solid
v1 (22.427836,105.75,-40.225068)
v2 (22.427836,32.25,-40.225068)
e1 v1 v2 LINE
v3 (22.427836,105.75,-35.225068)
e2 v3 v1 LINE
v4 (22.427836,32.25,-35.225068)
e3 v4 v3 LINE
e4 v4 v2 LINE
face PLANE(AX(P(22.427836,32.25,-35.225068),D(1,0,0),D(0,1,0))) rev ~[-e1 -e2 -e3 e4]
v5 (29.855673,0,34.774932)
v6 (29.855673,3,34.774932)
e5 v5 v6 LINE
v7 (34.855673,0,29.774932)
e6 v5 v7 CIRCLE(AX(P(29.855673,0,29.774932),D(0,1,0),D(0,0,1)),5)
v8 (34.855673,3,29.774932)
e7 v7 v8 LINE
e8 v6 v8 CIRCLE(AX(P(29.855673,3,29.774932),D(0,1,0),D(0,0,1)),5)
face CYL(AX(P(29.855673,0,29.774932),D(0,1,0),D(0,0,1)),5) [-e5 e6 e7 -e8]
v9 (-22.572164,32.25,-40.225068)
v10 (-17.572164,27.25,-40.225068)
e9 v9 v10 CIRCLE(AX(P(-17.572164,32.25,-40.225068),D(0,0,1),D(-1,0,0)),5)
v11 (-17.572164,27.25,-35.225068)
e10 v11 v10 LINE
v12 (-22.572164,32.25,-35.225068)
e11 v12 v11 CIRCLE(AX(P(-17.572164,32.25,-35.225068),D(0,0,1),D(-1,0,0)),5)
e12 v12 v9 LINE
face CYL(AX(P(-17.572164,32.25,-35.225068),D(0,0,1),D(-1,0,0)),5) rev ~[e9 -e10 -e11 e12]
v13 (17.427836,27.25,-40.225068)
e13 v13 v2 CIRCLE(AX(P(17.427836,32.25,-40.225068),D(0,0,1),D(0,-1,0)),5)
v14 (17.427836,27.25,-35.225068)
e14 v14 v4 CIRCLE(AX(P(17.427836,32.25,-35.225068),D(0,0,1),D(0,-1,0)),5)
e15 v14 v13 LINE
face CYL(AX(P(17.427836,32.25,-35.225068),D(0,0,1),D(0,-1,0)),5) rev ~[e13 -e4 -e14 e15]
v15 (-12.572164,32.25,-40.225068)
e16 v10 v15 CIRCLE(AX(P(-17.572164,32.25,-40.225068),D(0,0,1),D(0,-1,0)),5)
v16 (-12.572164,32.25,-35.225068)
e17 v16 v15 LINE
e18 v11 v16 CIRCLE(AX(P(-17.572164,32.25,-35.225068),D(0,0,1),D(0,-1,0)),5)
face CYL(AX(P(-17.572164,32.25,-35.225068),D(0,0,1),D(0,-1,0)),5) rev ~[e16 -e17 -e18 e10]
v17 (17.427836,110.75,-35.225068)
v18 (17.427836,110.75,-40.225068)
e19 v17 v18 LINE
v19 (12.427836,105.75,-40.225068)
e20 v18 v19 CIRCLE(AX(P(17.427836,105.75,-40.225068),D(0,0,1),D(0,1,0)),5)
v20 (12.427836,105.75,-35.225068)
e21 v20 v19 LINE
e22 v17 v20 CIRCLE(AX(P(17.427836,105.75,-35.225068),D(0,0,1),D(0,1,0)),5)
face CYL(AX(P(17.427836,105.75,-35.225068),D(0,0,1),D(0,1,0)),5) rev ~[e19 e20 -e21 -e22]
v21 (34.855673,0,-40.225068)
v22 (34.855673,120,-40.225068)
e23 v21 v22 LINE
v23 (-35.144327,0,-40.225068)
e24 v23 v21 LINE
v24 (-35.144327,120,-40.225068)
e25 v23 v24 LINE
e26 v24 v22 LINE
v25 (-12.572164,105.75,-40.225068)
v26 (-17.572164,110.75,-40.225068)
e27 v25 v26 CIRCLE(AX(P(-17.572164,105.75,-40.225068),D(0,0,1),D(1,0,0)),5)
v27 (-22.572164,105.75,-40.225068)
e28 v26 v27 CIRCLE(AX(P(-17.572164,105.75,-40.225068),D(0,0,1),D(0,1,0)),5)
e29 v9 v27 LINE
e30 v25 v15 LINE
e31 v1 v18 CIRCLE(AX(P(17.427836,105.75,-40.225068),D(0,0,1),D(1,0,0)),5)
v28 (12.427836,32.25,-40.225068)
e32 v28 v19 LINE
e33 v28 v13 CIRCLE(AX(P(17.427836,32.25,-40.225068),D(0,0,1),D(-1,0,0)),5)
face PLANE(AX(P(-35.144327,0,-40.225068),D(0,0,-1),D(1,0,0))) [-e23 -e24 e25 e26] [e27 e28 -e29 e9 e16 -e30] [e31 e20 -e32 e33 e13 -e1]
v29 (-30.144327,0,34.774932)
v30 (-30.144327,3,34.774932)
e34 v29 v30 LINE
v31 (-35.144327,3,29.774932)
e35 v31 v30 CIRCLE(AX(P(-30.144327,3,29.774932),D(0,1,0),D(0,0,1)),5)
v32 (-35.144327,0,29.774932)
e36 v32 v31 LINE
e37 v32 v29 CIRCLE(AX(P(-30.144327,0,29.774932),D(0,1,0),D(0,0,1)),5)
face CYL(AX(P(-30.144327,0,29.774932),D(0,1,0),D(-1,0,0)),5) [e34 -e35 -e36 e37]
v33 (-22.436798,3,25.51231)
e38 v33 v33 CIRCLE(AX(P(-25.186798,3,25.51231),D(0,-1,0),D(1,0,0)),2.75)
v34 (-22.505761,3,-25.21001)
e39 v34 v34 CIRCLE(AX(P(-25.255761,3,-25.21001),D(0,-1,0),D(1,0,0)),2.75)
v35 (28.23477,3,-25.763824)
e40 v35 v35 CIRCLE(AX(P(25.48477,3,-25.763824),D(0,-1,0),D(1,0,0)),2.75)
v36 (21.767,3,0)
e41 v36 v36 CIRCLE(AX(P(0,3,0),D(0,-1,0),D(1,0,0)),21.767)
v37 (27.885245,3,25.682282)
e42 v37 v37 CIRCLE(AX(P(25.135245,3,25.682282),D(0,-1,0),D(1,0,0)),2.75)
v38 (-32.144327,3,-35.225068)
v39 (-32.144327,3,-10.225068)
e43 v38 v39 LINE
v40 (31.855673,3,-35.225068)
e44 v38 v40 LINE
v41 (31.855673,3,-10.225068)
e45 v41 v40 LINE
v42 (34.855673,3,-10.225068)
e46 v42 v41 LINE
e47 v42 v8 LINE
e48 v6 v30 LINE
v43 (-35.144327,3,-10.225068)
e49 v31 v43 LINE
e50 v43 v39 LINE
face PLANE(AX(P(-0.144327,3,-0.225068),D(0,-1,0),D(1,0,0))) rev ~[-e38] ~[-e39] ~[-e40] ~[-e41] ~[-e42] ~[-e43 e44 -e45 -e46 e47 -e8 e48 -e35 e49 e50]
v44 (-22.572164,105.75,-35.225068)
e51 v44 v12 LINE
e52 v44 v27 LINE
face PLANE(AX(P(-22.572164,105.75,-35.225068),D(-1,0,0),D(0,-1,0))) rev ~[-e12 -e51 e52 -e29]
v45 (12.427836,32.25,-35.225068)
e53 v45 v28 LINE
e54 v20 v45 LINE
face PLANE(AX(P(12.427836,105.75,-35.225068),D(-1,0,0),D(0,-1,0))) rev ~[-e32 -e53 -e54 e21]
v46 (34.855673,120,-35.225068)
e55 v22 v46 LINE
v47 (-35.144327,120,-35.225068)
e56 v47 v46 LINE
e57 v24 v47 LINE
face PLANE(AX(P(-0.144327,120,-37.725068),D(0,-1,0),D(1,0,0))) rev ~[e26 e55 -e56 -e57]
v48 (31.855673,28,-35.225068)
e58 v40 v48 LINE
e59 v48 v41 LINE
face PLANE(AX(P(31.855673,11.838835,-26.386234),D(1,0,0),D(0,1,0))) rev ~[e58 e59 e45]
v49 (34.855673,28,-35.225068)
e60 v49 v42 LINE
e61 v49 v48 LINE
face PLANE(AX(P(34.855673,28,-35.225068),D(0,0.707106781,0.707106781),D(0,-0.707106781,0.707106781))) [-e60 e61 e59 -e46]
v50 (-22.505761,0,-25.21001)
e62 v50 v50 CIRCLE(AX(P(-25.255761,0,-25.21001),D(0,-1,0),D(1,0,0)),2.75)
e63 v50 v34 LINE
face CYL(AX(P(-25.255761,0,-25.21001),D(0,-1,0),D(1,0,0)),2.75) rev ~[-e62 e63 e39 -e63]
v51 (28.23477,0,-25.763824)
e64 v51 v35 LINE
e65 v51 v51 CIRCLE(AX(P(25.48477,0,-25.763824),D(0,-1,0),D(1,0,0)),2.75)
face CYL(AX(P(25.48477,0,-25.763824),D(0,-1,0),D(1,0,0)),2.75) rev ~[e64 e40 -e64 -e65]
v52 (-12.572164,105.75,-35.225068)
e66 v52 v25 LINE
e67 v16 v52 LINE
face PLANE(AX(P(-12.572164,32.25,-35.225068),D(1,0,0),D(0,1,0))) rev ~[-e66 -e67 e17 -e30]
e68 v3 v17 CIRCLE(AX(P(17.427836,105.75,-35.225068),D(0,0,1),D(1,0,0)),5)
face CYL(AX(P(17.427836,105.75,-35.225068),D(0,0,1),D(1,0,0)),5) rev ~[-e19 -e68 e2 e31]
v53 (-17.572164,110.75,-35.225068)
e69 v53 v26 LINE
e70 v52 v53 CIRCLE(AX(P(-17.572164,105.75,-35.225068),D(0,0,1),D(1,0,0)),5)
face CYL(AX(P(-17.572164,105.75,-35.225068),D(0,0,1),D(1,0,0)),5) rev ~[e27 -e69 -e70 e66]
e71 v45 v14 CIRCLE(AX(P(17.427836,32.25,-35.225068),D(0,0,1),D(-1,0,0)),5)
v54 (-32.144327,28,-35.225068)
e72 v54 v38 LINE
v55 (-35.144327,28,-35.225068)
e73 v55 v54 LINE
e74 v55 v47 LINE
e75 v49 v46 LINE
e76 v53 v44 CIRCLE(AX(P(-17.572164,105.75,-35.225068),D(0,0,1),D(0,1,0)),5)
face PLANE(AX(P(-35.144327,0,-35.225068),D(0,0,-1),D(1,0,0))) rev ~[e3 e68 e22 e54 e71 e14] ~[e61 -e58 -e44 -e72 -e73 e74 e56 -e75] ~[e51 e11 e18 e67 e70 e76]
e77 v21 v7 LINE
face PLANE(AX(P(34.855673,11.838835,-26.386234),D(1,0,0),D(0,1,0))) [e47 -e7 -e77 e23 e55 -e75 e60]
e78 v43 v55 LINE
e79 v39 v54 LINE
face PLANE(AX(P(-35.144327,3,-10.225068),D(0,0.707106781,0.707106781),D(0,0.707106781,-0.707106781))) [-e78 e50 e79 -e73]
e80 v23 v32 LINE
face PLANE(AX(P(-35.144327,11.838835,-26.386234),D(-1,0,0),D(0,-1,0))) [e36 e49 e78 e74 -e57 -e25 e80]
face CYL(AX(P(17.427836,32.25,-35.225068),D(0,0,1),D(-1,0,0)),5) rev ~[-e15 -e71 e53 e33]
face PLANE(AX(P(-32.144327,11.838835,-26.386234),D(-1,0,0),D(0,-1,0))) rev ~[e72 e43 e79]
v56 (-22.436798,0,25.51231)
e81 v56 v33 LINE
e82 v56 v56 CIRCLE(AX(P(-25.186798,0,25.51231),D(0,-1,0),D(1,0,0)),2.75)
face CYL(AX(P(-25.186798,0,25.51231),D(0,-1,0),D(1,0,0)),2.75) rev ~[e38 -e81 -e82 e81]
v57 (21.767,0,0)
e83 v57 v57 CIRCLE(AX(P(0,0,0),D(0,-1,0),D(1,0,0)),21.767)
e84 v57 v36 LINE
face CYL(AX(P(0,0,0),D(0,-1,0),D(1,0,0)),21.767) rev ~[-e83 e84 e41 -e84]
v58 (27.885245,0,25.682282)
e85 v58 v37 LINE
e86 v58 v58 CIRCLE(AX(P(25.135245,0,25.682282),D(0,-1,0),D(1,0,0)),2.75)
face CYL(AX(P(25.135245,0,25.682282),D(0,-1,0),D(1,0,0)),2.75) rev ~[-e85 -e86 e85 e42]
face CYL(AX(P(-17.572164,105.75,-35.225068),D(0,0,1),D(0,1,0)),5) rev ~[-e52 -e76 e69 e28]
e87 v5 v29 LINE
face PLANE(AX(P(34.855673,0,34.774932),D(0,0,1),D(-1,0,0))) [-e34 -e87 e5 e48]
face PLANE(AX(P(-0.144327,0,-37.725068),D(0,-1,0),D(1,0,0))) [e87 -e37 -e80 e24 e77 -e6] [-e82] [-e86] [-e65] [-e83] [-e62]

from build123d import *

# Parameters (mm, degrees)
F0_R      = 2.75
F1_DEPTH  = 3
F2_R      = 21.767
F3_DEPTH  = 25
F0_W      = 70
F0_H      = 5
F4_DEPTH  = 120
F6_DEPTH  = 25
F7_R      = 5
F9_DEPTH  = 3
F11_DEPTH = 3


# Not quite as in the source:
# - a feature names something its author has since deleted; it is built from what else it names


with BuildPart() as f1:
    # F0 (on Front) → F1 (new body)
    with BuildSketch(Plane.XZ):
        Polygon((-35.1443272789, 34.7749316851), (-35.1443272789, -30.2250683149), (-35.1443272789, -35.2250683149), (34.8556727211, -35.2250683149), (34.8556727211, 34.7749316851), align=None)
        Polygon((29.8556727211, -20.9088045945), (29.8556727211, -30.2250683149), (21.0454399179, -30.2250683149), (-20.0690244843, -30.2250683149), (-30.1443272789, -30.2250683149), (-30.1443272789, -20.0232621124), (-30.1443272789, 20.9646839807), (-30.1443272789, 29.7749316851), (-20.9545706917, 29.7749316851), (20.6652218889, 29.7749316851), (29.8556727211, 29.7749316851), (29.8556727211, 20.9646914313), align=None, mode=Mode.SUBTRACT)
        Polygon((-20.0690244843, -30.2250683149), (21.0454399179, -30.2250683149), (21.0454399179, -23.8184407195), (23.5755527805, -20.9088045945), (29.8556727211, -20.9088045945), (29.8556727211, 20.9646914313), (22.6900065731, 20.9646914313), (20.6652218889, 22.609265537), (20.6652218889, 29.7749316851), (-20.9545706917, 29.7749316851), (-20.9545706917, 23.6213151524), (-23.6111795117, 20.9646839807), (-30.1443272789, 20.9646839807), (-30.1443272789, -20.0232621124), (-22.8521441628, -20.0232621124), (-20.0690244843, -22.5533824255), align=None)
        Polygon((-30.1443272789, 29.7749316851), (-30.1443272789, 20.9646839807), (-23.6111795117, 20.9646839807), (-20.9545706917, 23.6213151524), (-20.9545706917, 29.7749316851), align=None)
        with Locations((-25.186798494, 25.5123097608)):
            Circle(F0_R, mode=Mode.SUBTRACT)
        Polygon((22.6900065731, 20.9646914313), (29.8556727211, 20.9646914313), (29.8556727211, 29.7749316851), (20.6652218889, 29.7749316851), (20.6652218889, 22.609265537), align=None)
        with Locations((25.1352448512, 25.6822819479)):
            Circle(F0_R, mode=Mode.SUBTRACT)
        Polygon((-30.1443272789, -30.2250683149), (-20.0690244843, -30.2250683149), (-20.0690244843, -22.5533824255), (-22.8521441628, -20.0232621124), (-30.1443272789, -20.0232621124), align=None)
        with Locations((-25.255761068, -25.2100098719)):
            Circle(F0_R, mode=Mode.SUBTRACT)
        Polygon((21.0454399179, -30.2250683149), (29.8556727211, -30.2250683149), (29.8556727211, -20.9088045945), (23.5755527805, -20.9088045945), (21.0454399179, -23.8184407195), align=None)
        with Locations((25.4847700376, -25.7638242348)):
            Circle(F0_R, mode=Mode.SUBTRACT)
    extrude(amount=-F1_DEPTH)

    # F2 (on face) → F3 (cut)
    with BuildSketch(Plane.XZ):
        Circle(F2_R)
    extrude(amount=-F3_DEPTH, mode=Mode.SUBTRACT)

    # F0 (on Front) → F4 (join)
    with BuildSketch(Plane.XZ):
        with Locations((-0.1443272789, -37.7250683149)):
            Rectangle(F0_W, F0_H)
    extrude(amount=-F4_DEPTH)

    # F5 (on face) → F6 (cut)
    with BuildSketch(Plane.XY.offset(-35.2250683149)):
        with BuildLine():
            Line((-17.5721636394, 90.75), (-12.5721636394, 90.75))
            ThreePointArc((-12.5721636394, 90.75), (-14.0366297335, 94.2855339059), (-17.5721636394, 95.75))
            Line((-17.5721636394, 95.75), (-17.5721636394, 90.75))
        make_face()
        with BuildLine():
            ThreePointArc((-17.5721636394, 95.75), (-21.1076975454, 94.2855339059), (-22.5721636394, 90.75))
            Line((-22.5721636394, 90.75), (-17.5721636394, 90.75))
            Line((-17.5721636394, 90.75), (-17.5721636394, 95.75))
        make_face()
        with BuildLine():
            Line((-17.5721636394, 90.75), (-22.5721636394, 90.75))
            ThreePointArc((-22.5721636394, 90.75), (-21.1076975454, 87.2144660941), (-17.5721636394, 85.75))
            Line((-17.5721636394, 85.75), (-17.5721636394, 90.75))
        make_face()
        with BuildLine():
            ThreePointArc((-17.5721636394, 85.75), (-14.0366297335, 87.2144660941), (-12.5721636394, 90.75))
            Line((-12.5721636394, 90.75), (-17.5721636394, 90.75))
            Line((-17.5721636394, 90.75), (-17.5721636394, 85.75))
        make_face()
        with BuildLine():
            Line((-12.5721636394, 32.25), (-12.5721636394, 90.75))
            ThreePointArc((-12.5721636394, 90.75), (-14.0366297335, 87.2144660941), (-17.5721636394, 85.75))
            Line((-17.5721636394, 85.75), (-17.5721636394, 37.25))
            ThreePointArc((-17.5721636394, 37.25), (-14.0366297335, 35.7855339059), (-12.5721636394, 32.25))
        make_face()
        with BuildLine():
            ThreePointArc((-17.5721636394, 85.75), (-21.1076975454, 87.2144660941), (-22.5721636394, 90.75))
            Line((-22.5721636394, 90.75), (-22.5721636394, 32.25))
            ThreePointArc((-22.5721636394, 32.25), (-21.1076975454, 35.7855339059), (-17.5721636394, 37.25))
            Line((-17.5721636394, 37.25), (-17.5721636394, 85.75))
        make_face()
        with BuildLine():
            ThreePointArc((-17.5721636394, 37.25), (-21.1076975454, 35.7855339059), (-22.5721636394, 32.25))
            Line((-22.5721636394, 32.25), (-17.5721636394, 32.25))
            Line((-17.5721636394, 32.25), (-17.5721636394, 37.25))
        make_face()
        with BuildLine():
            Line((-17.5721636394, 32.25), (-12.5721636394, 32.25))
            ThreePointArc((-12.5721636394, 32.25), (-14.0366297335, 35.7855339059), (-17.5721636394, 37.25))
            Line((-17.5721636394, 37.25), (-17.5721636394, 32.25))
        make_face()
        with BuildLine():
            ThreePointArc((-17.5721636394, 27.25), (-14.0366297335, 28.7144660941), (-12.5721636394, 32.25))
            Line((-12.5721636394, 32.25), (-17.5721636394, 32.25))
            Line((-17.5721636394, 32.25), (-17.5721636394, 27.25))
        make_face()
        with BuildLine():
            Line((-17.5721636394, 32.25), (-22.5721636394, 32.25))
            ThreePointArc((-22.5721636394, 32.25), (-21.1076975454, 28.7144660941), (-17.5721636394, 27.25))
            Line((-17.5721636394, 27.25), (-17.5721636394, 32.25))
        make_face()
        with BuildLine():
            Line((22.4278363606, 32.25), (22.4278363606, 90.75))
            ThreePointArc((22.4278363606, 90.75), (20.9633702665, 87.2144660941), (17.4278363606, 85.75))
            Line((17.4278363606, 85.75), (17.4278363606, 37.25))
            ThreePointArc((17.4278363606, 37.25), (20.9633702665, 35.7855339059), (22.4278363606, 32.25))
        make_face()
        with BuildLine():
            Line((17.4278363606, 90.75), (12.4278363606, 90.75))
            ThreePointArc((12.4278363606, 90.75), (13.8923024546, 87.2144660941), (17.4278363606, 85.75))
            Line((17.4278363606, 85.75), (17.4278363606, 90.75))
        make_face()
        with BuildLine():
            ThreePointArc((17.4278363606, 95.75), (13.8923024546, 94.2855339059), (12.4278363606, 90.75))
            Line((12.4278363606, 90.75), (17.4278363606, 90.75))
            Line((17.4278363606, 90.75), (17.4278363606, 95.75))
        make_face()
        with BuildLine():
            Line((17.4278363606, 90.75), (22.4278363606, 90.75))
            ThreePointArc((22.4278363606, 90.75), (20.9633702665, 94.2855339059), (17.4278363606, 95.75))
            Line((17.4278363606, 95.75), (17.4278363606, 90.75))
        make_face()
        with BuildLine():
            ThreePointArc((17.4278363606, 85.75), (20.9633702665, 87.2144660941), (22.4278363606, 90.75))
            Line((22.4278363606, 90.75), (17.4278363606, 90.75))
            Line((17.4278363606, 90.75), (17.4278363606, 85.75))
        make_face()
        with BuildLine():
            ThreePointArc((17.4278363606, 85.75), (13.8923024546, 87.2144660941), (12.4278363606, 90.75))
            Line((12.4278363606, 90.75), (12.4278363606, 32.25))
            ThreePointArc((12.4278363606, 32.25), (13.8923024546, 35.7855339059), (17.4278363606, 37.25))
            Line((17.4278363606, 37.25), (17.4278363606, 85.75))
        make_face()
        with BuildLine():
            ThreePointArc((17.4278363606, 37.25), (13.8923024546, 35.7855339059), (12.4278363606, 32.25))
            Line((12.4278363606, 32.25), (17.4278363606, 32.25))
            Line((17.4278363606, 32.25), (17.4278363606, 37.25))
        make_face()
        with BuildLine():
            Line((17.4278363606, 32.25), (22.4278363606, 32.25))
            ThreePointArc((22.4278363606, 32.25), (20.9633702665, 35.7855339059), (17.4278363606, 37.25))
            Line((17.4278363606, 37.25), (17.4278363606, 32.25))
        make_face()
        with BuildLine():
            ThreePointArc((17.4278363606, 27.25), (20.9633702665, 28.7144660941), (22.4278363606, 32.25))
            Line((22.4278363606, 32.25), (17.4278363606, 32.25))
            Line((17.4278363606, 32.25), (17.4278363606, 27.25))
        make_face()
        with BuildLine():
            Line((17.4278363606, 32.25), (12.4278363606, 32.25))
            ThreePointArc((12.4278363606, 32.25), (13.8923024546, 28.7144660941), (17.4278363606, 27.25))
            Line((17.4278363606, 27.25), (17.4278363606, 32.25))
        make_face()
        with BuildLine():
            ThreePointArc((-17.5721636394, 100.75), (-21.1076975454, 102.2144660941), (-22.5721636394, 105.75))
            Line((-22.5721636394, 105.75), (-22.5721636394, 90.75))
            ThreePointArc((-22.5721636394, 90.75), (-21.1076975454, 94.2855339059), (-17.5721636394, 95.75))
            Line((-17.5721636394, 95.75), (-17.5721636394, 100.75))
        make_face()
        with BuildLine():
            Line((-12.5721636394, 90.75), (-12.5721636394, 105.75))
            ThreePointArc((-12.5721636394, 105.75), (-14.0366297335, 102.2144660941), (-17.5721636394, 100.75))
            Line((-17.5721636394, 100.75), (-17.5721636394, 95.75))
            ThreePointArc((-17.5721636394, 95.75), (-14.0366297335, 94.2855339059), (-12.5721636394, 90.75))
        make_face()
        with BuildLine():
            ThreePointArc((17.4278363606, 100.75), (13.8923024546, 102.2144660941), (12.4278363606, 105.75))
            Line((12.4278363606, 105.75), (12.4278363606, 90.75))
            ThreePointArc((12.4278363606, 90.75), (13.8923024546, 94.2855339059), (17.4278363606, 95.75))
            Line((17.4278363606, 95.75), (17.4278363606, 100.75))
        make_face()
        with BuildLine():
            Line((22.4278363606, 90.75), (22.4278363606, 105.75))
            ThreePointArc((22.4278363606, 105.75), (20.9633702665, 102.2144660941), (17.4278363606, 100.75))
            Line((17.4278363606, 100.75), (17.4278363606, 95.75))
            ThreePointArc((17.4278363606, 95.75), (20.9633702665, 94.2855339059), (22.4278363606, 90.75))
        make_face()
        with BuildLine():
            Line((22.4278363606, 105.75), (17.4278363606, 105.75))
            Line((17.4278363606, 105.75), (17.4278363606, 100.75))
            ThreePointArc((17.4278363606, 100.75), (20.9633702665, 102.2144660941), (22.4278363606, 105.75))
        make_face()
        with BuildLine():
            ThreePointArc((22.4278363606, 105.75), (20.9633702665, 109.2855339059), (17.4278363606, 110.75))
            Line((17.4278363606, 110.75), (17.4278363606, 105.75))
            Line((17.4278363606, 105.75), (22.4278363606, 105.75))
        make_face()
        with BuildLine():
            Line((17.4278363606, 105.75), (17.4278363606, 110.75))
            ThreePointArc((17.4278363606, 110.75), (13.8923024546, 109.2855339059), (12.4278363606, 105.75))
            Line((12.4278363606, 105.75), (17.4278363606, 105.75))
        make_face()
        with BuildLine():
            Line((-17.5721636394, 105.75), (-17.5721636394, 110.75))
            ThreePointArc((-17.5721636394, 110.75), (-21.1076975454, 109.2855339059), (-22.5721636394, 105.75))
            Line((-22.5721636394, 105.75), (-17.5721636394, 105.75))
        make_face()
        with BuildLine():
            ThreePointArc((-12.5721636394, 105.75), (-14.0366297335, 109.2855339059), (-17.5721636394, 110.75))
            Line((-17.5721636394, 110.75), (-17.5721636394, 105.75))
            Line((-17.5721636394, 105.75), (-12.5721636394, 105.75))
        make_face()
        with BuildLine():
            Line((-12.5721636394, 105.75), (-17.5721636394, 105.75))
            Line((-17.5721636394, 105.75), (-17.5721636394, 100.75))
            ThreePointArc((-17.5721636394, 100.75), (-14.0366297335, 102.2144660941), (-12.5721636394, 105.75))
        make_face()
        with BuildLine():
            Line((-17.5721636394, 105.75), (-22.5721636394, 105.75))
            ThreePointArc((-22.5721636394, 105.75), (-21.1076975454, 102.2144660941), (-17.5721636394, 100.75))
            Line((-17.5721636394, 100.75), (-17.5721636394, 105.75))
        make_face()
        with BuildLine():
            Line((17.4278363606, 105.75), (12.4278363606, 105.75))
            ThreePointArc((12.4278363606, 105.75), (13.8923024546, 102.2144660941), (17.4278363606, 100.75))
            Line((17.4278363606, 100.75), (17.4278363606, 105.75))
        make_face()
    extrude(amount=-F6_DEPTH, mode=Mode.SUBTRACT)

    # F7
    f7_edges = [f1.edges().sort_by_distance(p)[0] for p in [
        (-35.144327, 1.5, 34.774932),
        (34.855673, 1.5, 34.774932),
    ]]
    fillet(f7_edges, radius=F7_R)

    # F8 (on face) → F9 (join)
    with BuildSketch(Plane(origin=(-35.1443272789, 0, 0), x_dir=(0, -1, 0), z_dir=(-1, 0, 0))):
        Polygon((-28, -35.2250683149), (-3, -35.2250683149), (-3, -10.2250683149), align=None)
    extrude(amount=-F9_DEPTH)

    # F10 (on face) → F11 (join)
    with BuildSketch(Plane.YZ.offset(34.8556727211)):
        Polygon((3, -10.2250683149), (3, -35.2250683149), (28, -35.2250683149), align=None)
    extrude(amount=-F11_DEPTH)


solid = f1.part
